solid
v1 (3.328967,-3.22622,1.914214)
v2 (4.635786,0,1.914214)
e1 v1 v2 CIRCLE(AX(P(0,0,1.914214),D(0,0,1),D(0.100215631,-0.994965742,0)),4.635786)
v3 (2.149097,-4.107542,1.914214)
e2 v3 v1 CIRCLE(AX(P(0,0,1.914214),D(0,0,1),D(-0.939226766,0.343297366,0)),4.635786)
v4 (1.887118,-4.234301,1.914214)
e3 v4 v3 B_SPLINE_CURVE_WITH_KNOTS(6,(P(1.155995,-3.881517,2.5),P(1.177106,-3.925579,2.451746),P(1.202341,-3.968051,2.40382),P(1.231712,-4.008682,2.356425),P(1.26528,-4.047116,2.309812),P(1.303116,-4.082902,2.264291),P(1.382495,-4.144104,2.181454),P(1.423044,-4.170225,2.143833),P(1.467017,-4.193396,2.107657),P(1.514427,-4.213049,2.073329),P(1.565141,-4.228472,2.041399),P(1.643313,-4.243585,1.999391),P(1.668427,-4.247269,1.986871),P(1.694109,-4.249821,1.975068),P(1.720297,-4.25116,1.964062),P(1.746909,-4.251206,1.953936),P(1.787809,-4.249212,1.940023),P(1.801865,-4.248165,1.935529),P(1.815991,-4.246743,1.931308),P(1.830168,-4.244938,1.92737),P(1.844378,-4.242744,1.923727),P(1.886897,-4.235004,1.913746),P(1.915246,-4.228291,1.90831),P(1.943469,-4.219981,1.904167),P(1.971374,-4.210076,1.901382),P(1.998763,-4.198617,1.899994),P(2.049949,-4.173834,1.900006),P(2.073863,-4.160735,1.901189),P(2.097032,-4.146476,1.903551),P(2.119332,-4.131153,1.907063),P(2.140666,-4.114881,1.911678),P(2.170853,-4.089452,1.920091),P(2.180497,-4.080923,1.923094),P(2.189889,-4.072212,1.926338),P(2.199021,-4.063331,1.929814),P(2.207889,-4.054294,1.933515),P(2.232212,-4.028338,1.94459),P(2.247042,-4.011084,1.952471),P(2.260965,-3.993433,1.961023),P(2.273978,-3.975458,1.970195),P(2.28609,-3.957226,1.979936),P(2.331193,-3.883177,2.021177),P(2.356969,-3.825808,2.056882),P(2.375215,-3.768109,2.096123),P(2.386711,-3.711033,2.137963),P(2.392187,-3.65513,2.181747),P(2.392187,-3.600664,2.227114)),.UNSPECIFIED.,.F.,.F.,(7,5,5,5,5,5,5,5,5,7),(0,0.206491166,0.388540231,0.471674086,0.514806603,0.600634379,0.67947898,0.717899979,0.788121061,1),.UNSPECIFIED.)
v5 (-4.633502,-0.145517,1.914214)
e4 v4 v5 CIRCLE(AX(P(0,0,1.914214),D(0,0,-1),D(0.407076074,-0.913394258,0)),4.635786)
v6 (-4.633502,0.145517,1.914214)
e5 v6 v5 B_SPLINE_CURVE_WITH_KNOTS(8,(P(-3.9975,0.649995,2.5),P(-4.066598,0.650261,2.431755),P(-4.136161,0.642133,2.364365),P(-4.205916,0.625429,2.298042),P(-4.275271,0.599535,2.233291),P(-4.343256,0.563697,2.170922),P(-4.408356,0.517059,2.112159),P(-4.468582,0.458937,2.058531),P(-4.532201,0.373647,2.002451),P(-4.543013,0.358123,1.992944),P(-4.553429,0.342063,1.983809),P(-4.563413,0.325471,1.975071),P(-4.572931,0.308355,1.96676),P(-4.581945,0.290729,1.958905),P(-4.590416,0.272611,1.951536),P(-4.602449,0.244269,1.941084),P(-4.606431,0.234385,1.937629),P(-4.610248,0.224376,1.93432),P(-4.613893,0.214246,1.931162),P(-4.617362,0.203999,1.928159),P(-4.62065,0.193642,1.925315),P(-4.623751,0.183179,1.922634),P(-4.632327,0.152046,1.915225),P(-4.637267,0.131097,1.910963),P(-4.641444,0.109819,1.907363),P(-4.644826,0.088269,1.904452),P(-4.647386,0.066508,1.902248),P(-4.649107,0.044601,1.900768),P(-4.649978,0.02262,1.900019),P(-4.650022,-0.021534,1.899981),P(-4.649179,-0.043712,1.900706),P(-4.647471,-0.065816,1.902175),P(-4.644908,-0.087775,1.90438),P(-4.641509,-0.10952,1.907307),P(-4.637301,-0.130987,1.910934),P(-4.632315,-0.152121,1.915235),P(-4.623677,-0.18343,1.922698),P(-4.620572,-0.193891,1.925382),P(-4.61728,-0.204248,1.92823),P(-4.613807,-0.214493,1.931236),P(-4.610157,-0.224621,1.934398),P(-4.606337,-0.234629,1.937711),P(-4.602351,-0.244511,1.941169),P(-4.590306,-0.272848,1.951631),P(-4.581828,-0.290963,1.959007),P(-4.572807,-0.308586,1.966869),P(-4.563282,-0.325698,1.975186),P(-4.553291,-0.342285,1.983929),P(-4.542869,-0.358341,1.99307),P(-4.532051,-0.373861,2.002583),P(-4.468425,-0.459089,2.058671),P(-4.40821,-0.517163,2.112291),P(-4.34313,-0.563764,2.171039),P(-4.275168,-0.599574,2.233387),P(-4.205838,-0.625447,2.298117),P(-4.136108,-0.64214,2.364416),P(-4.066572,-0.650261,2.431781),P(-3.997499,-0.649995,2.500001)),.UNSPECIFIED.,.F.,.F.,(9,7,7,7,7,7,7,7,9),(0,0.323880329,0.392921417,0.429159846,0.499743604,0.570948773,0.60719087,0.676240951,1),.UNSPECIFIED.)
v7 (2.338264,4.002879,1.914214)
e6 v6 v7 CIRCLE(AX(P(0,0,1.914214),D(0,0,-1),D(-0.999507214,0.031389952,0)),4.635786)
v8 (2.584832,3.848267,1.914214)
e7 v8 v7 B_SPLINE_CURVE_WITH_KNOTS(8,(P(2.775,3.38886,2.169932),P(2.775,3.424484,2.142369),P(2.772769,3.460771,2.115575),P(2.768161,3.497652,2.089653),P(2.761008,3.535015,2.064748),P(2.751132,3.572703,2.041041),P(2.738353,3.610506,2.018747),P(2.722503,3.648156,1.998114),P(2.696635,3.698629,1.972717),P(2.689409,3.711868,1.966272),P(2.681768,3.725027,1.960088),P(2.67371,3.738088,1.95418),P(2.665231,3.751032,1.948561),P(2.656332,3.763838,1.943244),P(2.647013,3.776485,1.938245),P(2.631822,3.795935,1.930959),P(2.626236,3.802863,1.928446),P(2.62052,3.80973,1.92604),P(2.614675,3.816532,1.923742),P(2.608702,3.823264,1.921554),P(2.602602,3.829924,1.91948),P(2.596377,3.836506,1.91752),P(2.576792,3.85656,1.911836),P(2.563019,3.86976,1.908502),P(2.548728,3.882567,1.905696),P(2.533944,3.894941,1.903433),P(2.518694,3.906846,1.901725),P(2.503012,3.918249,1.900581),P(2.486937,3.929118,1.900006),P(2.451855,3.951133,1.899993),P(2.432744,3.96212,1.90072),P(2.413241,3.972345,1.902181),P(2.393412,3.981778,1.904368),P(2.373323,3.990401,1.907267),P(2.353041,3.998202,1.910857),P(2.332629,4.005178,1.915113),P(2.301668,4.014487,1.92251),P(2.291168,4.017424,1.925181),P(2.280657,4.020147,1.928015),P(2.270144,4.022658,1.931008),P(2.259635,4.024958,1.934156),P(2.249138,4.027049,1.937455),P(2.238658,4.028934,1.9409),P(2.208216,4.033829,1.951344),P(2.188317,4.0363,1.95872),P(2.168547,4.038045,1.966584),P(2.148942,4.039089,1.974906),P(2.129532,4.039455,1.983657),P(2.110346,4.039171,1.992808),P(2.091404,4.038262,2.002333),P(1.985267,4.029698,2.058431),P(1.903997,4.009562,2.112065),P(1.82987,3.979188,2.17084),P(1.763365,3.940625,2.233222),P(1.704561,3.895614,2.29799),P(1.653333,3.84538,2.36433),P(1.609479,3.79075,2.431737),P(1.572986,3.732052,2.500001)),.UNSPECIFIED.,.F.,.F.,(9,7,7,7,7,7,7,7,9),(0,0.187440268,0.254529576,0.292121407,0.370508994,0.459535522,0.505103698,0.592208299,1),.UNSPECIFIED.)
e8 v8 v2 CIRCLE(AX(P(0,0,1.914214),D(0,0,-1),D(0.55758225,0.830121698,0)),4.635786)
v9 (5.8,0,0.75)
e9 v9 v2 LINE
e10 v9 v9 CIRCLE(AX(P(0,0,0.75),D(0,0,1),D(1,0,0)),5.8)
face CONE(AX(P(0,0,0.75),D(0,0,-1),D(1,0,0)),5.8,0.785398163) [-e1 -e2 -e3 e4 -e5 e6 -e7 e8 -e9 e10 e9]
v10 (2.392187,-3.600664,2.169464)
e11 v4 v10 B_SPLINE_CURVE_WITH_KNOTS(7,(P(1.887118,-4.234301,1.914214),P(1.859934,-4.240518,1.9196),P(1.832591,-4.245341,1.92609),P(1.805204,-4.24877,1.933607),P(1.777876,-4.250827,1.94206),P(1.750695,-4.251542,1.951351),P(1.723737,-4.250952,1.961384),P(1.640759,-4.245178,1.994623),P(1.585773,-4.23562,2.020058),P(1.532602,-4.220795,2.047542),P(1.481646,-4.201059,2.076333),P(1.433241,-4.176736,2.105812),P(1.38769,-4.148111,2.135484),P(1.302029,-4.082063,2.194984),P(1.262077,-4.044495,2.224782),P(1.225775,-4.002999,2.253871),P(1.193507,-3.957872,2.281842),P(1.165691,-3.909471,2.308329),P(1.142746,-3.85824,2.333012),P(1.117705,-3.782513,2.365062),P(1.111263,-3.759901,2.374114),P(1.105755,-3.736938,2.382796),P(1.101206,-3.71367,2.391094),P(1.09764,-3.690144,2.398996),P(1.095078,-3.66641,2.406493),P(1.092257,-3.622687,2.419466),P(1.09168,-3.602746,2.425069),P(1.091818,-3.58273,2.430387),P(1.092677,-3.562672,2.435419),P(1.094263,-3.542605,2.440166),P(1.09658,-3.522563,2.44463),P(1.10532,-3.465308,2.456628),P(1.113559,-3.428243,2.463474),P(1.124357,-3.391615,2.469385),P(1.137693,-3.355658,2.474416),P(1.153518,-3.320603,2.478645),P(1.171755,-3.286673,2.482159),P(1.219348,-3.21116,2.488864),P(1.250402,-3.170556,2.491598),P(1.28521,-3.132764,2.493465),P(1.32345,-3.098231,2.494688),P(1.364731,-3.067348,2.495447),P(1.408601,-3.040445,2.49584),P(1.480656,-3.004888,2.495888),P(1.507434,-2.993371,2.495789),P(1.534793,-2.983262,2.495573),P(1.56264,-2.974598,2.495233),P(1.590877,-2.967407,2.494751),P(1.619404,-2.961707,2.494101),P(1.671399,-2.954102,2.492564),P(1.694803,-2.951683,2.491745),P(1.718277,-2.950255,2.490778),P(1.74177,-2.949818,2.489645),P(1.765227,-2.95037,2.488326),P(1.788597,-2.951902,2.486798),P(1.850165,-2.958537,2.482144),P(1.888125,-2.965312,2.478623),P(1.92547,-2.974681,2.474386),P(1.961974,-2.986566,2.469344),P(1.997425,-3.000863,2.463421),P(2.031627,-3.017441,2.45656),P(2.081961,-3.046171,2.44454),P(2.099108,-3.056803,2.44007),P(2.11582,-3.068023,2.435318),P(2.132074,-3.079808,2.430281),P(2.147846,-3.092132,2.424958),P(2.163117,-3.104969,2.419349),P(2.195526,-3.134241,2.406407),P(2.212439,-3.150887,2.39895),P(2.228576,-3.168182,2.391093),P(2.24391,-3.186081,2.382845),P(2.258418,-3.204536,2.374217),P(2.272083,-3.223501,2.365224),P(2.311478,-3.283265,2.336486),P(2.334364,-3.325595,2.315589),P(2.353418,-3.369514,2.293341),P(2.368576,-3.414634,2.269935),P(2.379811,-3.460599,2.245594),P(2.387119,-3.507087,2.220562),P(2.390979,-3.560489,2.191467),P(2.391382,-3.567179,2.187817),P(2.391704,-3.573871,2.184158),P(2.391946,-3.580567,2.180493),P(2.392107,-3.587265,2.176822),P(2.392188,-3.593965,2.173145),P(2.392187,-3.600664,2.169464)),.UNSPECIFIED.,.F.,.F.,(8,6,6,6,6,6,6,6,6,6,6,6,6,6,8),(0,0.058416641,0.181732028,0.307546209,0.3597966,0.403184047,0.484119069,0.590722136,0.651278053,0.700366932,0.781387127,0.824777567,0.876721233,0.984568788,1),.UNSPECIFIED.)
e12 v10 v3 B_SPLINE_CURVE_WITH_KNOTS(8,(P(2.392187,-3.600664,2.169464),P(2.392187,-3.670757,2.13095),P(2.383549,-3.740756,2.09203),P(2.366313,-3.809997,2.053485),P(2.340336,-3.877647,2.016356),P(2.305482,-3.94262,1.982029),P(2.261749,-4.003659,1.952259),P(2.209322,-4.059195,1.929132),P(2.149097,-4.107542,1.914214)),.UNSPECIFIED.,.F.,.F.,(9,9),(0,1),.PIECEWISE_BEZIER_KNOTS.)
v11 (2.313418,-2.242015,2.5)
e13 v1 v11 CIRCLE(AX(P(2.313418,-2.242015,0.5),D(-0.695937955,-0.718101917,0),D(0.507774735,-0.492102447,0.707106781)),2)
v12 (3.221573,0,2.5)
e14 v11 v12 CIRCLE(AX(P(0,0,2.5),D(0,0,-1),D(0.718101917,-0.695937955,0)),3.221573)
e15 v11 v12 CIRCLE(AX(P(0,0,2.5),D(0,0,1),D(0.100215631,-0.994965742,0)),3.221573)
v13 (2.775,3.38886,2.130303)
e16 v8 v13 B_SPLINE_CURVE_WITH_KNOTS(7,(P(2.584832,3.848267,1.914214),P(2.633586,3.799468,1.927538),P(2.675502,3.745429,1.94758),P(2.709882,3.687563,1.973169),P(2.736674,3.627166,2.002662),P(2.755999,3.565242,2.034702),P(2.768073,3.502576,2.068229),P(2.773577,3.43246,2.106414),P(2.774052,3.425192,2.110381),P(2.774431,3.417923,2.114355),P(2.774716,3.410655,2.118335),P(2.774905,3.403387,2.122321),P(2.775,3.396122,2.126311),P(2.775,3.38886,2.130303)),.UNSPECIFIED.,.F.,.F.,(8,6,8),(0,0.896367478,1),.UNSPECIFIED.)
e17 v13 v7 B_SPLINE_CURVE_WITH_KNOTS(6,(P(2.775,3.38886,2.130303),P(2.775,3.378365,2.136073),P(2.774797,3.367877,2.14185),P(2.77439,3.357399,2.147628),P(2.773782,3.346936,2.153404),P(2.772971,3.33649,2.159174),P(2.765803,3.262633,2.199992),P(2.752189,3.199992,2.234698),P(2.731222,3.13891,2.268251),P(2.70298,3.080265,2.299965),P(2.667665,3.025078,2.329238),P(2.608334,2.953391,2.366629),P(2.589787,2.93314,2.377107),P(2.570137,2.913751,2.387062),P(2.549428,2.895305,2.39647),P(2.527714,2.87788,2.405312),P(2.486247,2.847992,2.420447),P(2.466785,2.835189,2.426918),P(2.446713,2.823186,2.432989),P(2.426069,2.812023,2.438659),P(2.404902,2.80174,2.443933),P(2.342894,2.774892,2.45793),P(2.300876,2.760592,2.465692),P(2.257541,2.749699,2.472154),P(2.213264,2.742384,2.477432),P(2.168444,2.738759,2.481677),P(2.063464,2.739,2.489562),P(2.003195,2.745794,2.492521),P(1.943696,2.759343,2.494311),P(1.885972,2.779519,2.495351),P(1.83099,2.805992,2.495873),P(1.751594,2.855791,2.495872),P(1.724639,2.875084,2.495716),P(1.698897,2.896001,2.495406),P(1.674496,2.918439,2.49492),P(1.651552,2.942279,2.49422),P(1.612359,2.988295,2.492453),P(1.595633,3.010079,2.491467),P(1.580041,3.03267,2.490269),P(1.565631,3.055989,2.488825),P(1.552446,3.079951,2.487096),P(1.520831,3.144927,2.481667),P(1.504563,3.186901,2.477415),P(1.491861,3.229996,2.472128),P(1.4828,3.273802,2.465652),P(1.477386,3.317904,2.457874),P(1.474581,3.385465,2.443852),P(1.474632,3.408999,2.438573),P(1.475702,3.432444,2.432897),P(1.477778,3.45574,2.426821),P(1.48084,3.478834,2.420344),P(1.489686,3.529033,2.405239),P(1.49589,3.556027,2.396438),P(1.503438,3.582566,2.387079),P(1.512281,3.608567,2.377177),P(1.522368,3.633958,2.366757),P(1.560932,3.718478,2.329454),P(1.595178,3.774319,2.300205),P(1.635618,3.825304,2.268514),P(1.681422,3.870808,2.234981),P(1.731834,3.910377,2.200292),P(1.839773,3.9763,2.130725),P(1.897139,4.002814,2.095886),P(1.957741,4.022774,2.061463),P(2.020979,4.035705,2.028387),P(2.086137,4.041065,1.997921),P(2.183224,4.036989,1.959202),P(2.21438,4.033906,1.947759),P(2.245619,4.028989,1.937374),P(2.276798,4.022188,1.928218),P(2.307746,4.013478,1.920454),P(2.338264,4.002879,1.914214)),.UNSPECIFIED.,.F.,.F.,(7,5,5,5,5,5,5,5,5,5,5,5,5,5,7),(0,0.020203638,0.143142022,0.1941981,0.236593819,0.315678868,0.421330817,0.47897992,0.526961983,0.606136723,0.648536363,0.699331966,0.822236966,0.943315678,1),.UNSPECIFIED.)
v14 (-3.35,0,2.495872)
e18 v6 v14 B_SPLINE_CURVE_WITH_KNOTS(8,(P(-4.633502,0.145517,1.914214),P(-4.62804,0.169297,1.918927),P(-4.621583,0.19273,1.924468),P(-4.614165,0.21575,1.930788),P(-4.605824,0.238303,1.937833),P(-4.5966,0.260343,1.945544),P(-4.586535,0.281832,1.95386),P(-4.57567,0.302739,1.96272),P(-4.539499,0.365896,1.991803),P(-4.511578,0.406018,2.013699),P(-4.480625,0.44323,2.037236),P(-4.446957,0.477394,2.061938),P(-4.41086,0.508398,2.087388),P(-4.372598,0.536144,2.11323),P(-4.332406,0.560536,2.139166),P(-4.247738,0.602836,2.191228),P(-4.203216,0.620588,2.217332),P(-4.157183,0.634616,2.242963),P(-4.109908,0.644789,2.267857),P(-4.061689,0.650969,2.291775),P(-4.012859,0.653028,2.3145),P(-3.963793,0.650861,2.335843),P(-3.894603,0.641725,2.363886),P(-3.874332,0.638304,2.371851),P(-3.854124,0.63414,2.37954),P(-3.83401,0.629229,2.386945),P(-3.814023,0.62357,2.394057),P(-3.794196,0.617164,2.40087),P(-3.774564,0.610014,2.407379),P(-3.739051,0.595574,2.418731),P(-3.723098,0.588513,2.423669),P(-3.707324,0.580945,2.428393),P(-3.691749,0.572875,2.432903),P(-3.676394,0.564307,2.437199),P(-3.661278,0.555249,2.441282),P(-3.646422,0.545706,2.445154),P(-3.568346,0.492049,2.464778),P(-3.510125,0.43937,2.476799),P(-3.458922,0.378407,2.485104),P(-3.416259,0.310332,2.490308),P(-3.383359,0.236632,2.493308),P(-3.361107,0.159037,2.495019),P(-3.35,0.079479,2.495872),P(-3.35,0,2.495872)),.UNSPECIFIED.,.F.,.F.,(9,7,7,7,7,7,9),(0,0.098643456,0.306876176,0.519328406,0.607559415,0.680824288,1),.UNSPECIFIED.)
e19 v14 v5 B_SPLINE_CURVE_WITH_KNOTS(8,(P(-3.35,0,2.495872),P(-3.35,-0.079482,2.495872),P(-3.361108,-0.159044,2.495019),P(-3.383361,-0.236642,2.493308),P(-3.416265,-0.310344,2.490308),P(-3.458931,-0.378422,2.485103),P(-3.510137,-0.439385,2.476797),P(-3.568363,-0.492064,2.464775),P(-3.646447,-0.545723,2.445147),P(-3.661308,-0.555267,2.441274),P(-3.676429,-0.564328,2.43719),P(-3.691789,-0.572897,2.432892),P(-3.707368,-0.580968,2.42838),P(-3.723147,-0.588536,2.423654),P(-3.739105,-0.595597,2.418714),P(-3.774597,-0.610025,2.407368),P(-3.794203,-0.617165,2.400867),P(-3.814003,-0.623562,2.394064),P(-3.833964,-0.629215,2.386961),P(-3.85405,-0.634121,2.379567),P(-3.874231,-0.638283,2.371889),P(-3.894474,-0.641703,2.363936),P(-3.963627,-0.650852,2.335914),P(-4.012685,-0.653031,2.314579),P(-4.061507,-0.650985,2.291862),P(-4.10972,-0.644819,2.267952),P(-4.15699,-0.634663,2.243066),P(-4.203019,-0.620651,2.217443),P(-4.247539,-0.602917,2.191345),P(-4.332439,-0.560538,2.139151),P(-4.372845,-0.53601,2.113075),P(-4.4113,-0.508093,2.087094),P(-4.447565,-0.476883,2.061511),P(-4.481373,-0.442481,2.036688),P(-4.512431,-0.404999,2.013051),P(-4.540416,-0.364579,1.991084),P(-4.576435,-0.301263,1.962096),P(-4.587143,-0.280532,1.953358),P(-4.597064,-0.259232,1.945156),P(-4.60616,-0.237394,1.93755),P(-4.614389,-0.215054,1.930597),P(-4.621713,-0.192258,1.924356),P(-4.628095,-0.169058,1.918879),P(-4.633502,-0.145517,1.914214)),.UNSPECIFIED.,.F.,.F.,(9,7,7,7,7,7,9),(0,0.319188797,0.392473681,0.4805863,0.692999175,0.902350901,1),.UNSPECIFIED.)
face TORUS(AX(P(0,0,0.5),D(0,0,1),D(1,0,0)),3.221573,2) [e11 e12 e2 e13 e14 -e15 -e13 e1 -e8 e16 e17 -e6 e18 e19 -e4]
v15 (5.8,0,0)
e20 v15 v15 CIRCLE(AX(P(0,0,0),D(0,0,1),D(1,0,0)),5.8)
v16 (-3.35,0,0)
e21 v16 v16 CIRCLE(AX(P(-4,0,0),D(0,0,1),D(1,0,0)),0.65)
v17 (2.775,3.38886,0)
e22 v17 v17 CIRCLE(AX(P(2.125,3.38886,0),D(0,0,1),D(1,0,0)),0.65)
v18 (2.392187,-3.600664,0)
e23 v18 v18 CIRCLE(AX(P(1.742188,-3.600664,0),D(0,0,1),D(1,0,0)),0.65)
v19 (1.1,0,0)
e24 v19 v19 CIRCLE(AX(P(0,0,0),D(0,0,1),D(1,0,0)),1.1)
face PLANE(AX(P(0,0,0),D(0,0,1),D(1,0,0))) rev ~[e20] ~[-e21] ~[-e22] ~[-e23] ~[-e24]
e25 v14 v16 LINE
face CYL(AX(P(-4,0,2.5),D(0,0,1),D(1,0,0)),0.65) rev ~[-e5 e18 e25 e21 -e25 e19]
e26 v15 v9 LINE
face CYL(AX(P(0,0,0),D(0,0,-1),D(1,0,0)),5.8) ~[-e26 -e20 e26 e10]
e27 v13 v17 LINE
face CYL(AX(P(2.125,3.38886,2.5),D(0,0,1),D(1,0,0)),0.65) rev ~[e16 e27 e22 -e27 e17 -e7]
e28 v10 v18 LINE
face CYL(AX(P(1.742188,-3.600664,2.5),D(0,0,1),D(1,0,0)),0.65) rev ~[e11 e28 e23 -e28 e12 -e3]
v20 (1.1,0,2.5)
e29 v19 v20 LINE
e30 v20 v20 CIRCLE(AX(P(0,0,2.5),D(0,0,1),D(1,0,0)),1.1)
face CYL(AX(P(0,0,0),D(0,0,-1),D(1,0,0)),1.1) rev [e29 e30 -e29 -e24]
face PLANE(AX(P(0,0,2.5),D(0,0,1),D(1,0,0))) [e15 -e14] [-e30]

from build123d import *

# Parameters (mm, degrees)
F0_R        = 5.8
F0_R_2      = 1.1
F1_DEPTH    = 2.5
F2_R        = 0.65
F3_DEPTH    = 25
F5_T2_ANGLE = 77.9776147156
F5_T4_ANGLE = 162.2494051266
F5_T6_ANGLE = 155.9758879551
F5_T8_ANGLE = 84.2484124222


# Not quite as in the source:
# - a fillet or chamfer that OpenCascade refuses, or shapes differently, is made with other operations: its cross-section is extruded or revolved along the edge and cut away or added


with BuildPart() as f1:
    # F0 (on Top) → F1 (new body)
    with BuildSketch(Plane.XY):
        Circle(F0_R)
        Circle(F0_R_2, mode=Mode.SUBTRACT)
    extrude(amount=F1_DEPTH)

    # F2 (on face) → F3 (cut)
    with BuildSketch(Plane.XY.offset(2.5)):
        with Locations((-4, 0)):
            Circle(F2_R)
        with Locations((2.125, 3.3888604279)):
            Circle(F2_R)
        with Locations((1.7421875, -3.6006642047)):
            Circle(F2_R)
    extrude(amount=-F3_DEPTH, mode=Mode.SUBTRACT)

    # F4: chamfer of 1.75 on 1 edges, made by hand

    # F4_s1 → F4_t2 (revolve, cut)
    with BuildSketch(Plane.XZ):
        Polygon((5.8, 0.75), (4.05, 2.5), (5.8, 2.5), align=None)
    revolve(axis=Axis((0, 0, 2.5), (0, 0, 1)), mode=Mode.SUBTRACT)

    # F5: fillet of radius 2 on 4 edges, made by hand

    # F5_s1 → F5_t2 (revolve, cut)
    with BuildSketch(Plane.XZ):
        with BuildLine():
            ThreePointArc((4.6357864376, 1.9142135624), (3.98693974, 2.347759065), (3.2215728753, 2.5))
            Line((3.2215728753, 2.5), (4.05, 2.5))
            Line((4.05, 2.5), (4.6357864376, 1.9142135624))
        make_face()
    revolve(axis=Axis((0, 0, 2.5), (0, 0, 1)), revolution_arc=F5_T2_ANGLE, mode=Mode.SUBTRACT)

    # F5_s3 → F5_t4 (revolve, cut)
    with BuildSketch(Plane(origin=(0, 0, 0), x_dir=(0, 0, 1), z_dir=(0.61332513, -0.7898305419, 0))):
        with BuildLine():
            ThreePointArc((1.9142135624, -4.6357864376), (2.347759065, -3.98693974), (2.5, -3.2215728753))
            Line((2.5, -3.2215728753), (2.5, -4.05))
            Line((2.5, -4.05), (1.9142135624, -4.6357864376))
        make_face()
    revolve(axis=Axis((0, 0, 2.5), (0, 0, 1)), revolution_arc=F5_T4_ANGLE, mode=Mode.SUBTRACT)

    # F5_s5 → F5_t6 (revolve, cut)
    with BuildSketch(Plane(origin=(0, 0, 0), x_dir=(0, 0, 1), z_dir=(0.3432973656, 0.9392267664, 0))):
        with BuildLine():
            ThreePointArc((1.9142135624, -4.6357864376), (2.347759065, -3.98693974), (2.5, -3.2215728753))
            Line((2.5, -3.2215728753), (2.5, -4.05))
            Line((2.5, -4.05), (1.9142135624, -4.6357864376))
        make_face()
    revolve(axis=Axis((0, 0, 2.5), (0, 0, 1)), revolution_arc=F5_T6_ANGLE, mode=Mode.SUBTRACT)

    # F5_s7 → F5_t8 (revolve, cut)
    with BuildSketch(Plane(origin=(0, 0, 0), x_dir=(0, 0, 1), z_dir=(-0.9949657418, -0.1002156306, 0))):
        with BuildLine():
            ThreePointArc((1.9142135624, -4.6357864376), (2.347759065, -3.98693974), (2.5, -3.2215728753))
            Line((2.5, -3.2215728753), (2.5, -4.05))
            Line((2.5, -4.05), (1.9142135624, -4.6357864376))
        make_face()
    revolve(axis=Axis((0, 0, 2.5), (0, 0, 1)), revolution_arc=F5_T8_ANGLE, mode=Mode.SUBTRACT)


solid = f1.part
